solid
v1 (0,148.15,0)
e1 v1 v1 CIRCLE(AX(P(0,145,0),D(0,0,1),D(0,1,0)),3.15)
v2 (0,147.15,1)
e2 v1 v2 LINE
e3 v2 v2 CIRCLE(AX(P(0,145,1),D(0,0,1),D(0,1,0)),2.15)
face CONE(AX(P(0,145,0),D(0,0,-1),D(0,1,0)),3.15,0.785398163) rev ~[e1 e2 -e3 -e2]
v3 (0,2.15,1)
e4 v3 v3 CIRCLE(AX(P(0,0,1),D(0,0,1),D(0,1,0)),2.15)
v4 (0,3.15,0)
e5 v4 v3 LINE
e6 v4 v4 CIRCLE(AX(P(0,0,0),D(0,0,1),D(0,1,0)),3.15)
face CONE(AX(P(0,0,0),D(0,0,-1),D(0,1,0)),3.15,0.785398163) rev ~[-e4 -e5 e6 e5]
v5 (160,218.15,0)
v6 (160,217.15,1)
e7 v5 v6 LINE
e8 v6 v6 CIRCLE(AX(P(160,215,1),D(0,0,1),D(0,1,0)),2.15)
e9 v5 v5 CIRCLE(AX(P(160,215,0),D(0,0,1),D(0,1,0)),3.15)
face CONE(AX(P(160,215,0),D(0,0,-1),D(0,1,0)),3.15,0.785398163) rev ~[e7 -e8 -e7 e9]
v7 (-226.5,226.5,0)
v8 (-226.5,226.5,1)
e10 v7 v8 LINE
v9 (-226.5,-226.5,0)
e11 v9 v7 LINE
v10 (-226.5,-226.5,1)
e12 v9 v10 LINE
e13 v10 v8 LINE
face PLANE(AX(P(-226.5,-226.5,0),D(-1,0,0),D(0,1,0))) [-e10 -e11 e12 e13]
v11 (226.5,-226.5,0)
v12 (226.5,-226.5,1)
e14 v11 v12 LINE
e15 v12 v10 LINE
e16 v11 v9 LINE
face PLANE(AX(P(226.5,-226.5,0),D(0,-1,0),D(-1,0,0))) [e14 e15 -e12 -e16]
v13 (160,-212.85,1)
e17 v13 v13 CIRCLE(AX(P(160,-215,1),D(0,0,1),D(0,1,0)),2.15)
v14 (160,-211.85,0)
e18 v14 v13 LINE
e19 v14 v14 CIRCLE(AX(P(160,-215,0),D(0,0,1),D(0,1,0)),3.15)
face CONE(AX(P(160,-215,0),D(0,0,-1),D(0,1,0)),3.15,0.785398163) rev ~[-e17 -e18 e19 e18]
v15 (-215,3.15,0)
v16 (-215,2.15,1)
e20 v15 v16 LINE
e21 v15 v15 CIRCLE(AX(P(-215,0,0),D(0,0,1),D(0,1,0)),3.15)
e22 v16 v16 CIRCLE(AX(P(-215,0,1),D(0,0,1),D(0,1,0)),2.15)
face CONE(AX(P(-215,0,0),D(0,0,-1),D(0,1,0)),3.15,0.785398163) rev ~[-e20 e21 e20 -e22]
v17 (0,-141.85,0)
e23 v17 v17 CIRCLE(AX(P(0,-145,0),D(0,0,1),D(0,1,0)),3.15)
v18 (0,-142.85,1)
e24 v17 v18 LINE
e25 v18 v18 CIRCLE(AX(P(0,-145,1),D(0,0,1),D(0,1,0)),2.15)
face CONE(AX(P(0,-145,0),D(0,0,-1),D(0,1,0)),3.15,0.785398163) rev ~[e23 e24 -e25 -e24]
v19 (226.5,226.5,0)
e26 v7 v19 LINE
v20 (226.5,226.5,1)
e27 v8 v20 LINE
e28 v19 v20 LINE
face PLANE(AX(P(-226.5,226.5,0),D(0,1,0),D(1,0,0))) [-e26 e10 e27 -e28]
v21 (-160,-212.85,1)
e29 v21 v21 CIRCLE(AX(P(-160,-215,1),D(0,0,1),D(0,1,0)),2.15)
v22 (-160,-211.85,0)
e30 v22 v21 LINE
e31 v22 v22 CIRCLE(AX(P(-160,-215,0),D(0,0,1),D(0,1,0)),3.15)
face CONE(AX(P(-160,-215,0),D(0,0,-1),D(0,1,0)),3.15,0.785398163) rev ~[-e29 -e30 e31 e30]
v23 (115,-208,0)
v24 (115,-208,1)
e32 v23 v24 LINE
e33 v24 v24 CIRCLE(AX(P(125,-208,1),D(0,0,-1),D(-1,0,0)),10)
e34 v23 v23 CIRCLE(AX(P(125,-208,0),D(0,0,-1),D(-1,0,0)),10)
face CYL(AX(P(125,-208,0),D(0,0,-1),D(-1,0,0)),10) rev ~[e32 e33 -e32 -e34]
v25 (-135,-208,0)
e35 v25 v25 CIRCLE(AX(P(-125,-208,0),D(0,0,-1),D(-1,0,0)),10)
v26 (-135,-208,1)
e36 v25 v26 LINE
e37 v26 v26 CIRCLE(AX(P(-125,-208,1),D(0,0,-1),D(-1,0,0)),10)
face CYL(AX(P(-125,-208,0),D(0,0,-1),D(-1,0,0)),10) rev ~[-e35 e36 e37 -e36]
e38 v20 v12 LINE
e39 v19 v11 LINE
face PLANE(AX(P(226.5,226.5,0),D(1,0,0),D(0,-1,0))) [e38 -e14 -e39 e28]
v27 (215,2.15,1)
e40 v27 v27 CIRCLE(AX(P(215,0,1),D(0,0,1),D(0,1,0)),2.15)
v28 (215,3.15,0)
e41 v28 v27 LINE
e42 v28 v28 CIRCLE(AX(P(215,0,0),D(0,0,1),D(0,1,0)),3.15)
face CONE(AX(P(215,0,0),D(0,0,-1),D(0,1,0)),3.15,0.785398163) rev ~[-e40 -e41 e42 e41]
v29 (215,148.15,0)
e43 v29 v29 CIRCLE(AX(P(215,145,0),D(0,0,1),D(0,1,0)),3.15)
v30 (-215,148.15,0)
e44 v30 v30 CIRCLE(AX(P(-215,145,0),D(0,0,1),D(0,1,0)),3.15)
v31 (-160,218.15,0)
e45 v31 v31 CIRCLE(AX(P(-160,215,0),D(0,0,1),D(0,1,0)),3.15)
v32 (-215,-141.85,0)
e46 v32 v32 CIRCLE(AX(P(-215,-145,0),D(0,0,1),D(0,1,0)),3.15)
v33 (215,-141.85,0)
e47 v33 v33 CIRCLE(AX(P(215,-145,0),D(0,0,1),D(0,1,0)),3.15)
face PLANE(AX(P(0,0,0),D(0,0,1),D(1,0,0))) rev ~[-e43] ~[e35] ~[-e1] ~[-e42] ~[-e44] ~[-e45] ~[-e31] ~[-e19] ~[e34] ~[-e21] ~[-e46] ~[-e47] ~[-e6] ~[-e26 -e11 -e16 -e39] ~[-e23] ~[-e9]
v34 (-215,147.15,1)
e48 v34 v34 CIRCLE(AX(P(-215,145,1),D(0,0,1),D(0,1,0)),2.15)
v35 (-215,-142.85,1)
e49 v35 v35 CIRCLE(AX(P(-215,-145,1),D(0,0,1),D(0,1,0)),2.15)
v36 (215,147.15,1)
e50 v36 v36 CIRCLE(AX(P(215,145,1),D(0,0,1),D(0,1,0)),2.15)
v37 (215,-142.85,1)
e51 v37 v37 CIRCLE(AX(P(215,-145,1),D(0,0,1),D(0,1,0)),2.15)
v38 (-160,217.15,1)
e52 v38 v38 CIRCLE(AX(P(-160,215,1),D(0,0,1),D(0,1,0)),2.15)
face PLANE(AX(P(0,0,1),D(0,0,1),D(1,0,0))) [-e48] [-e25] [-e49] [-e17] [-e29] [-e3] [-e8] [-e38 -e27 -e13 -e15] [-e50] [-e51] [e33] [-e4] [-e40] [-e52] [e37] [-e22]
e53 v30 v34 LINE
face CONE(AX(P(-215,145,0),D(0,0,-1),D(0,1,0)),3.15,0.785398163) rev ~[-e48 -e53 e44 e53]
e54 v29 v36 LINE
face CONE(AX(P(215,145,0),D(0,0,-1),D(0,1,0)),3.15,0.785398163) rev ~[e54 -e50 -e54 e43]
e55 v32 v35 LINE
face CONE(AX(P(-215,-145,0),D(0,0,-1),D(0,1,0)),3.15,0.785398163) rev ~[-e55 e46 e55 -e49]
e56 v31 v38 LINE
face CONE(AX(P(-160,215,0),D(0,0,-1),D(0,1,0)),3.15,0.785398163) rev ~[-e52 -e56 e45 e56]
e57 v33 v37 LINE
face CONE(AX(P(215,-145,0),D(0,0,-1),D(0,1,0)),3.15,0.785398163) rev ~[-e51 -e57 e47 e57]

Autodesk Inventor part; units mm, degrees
ref_plane "YZ Plane" through (0, 0, 0) normal (1, 0, 0) x (0, 1, 0)
ref_plane "XZ Plane" through (0, 0, 0) normal (0, 1, 0) x (-1, 0, 0)
ref_plane "XY Plane" through (0, 0, 0) normal (0, 0, 1) x (1, 0, 0)
sketch "Skizze2" plane through (0, 0, 0) normal (0, 0, 1) x (1, 0, 0)
  line L0 (-226.5, 226.5) -> (226.5, 226.5)
  line L1 (226.5, 226.5) -> (226.5, -226.5)
  line L2 (226.5, -226.5) -> (-226.5, -226.5)
  line L3 (-226.5, -226.5) -> (-226.5, 226.5)
  point P0 (0, 0)
  point P1 (0, 226.5)
  point P2 (-226.5, 0)
  dimension "d0" = 453
extrude "Extrusion1" add sketch "Skizze2" along normal blind 1
sketch "Skizze3" plane through (0, 0, 0) normal (0, 0, -1) x (-1, 0, 0)
  circle A0 centre (125, -208) radius 10
  line L0 (0, -317.1) -> (0, 317.1) projected
  line L1 (226.5, -226.5) -> (-226.5, -226.5) projected
  point P0 (0, 0)
  dimension "d3" = 20
  dimension "d4" = 125
  dimension "d5" = 18.5
extrude "Extrusion2" cut sketch "Skizze3" against normal blind 1
pattern_linear "Rechteckige Anordnung1" count 2 spacing 250 along (1, 0, 0) of "Extrusion2"
sketch "Skizze4" plane through (0, 0, 0) normal (0, 0, -1) x (-1, 0, 0)
  point P0 (0, 0)
  point P1 (160, -215)
  point P2 (-160, -215)
  point P3 (-160, 215)
  point P4 (160, 215)
  point P5 (0, 0)
  point P6 (-215, -145)
  point P7 (-215, 0)
  point P8 (-215, 145)
  point P9 (215, 145)
  point P10 (215, 0)
  point P11 (215, -145)
  point P12 (0, 0)
  point P13 (0, -145)
  point P14 (0, 145)
  dimension "d11" = 160
  dimension "d12" = 160
  dimension "d13" = 215
  dimension "d14" = 215
  dimension "d22" = 215
  dimension "d23" = 145
  dimension "d24" = 145
  dimension "d25" = 215
  dimension "d26" = 145
  dimension "d27" = 145
hole "Bohrung1" at (0, 0, 0) direction (0, 0, 1) diameter 3.4 depth 15 tip angle 118 countersink diameter 6.3 countersink angle 90 clearance for "Flachkopfsenkschraube" size "M3" standard "Schneeberger VSM"
pattern_sketch "Skizzenbasierte Anordnung1" of "Bohrung1" from (0, 0, 0) copies at (-160, -215, 0) at (160, -215, 0) at (160, 215, 0) at (-160, 215, 0) at (215, -145, 0) at (215, 0, 0) at (215, 145, 0) at (-215, 145, 0) at (-215, 0, 0) at (-215, -145, 0) at (0, -145, 0) at (0, 145, 0)
equation "\"d10\" = 2 * d4"
equation "\"d14\" = d13"
equation "\"d23\" = d24"
equation "\"d25\" = d22"
equation "\"d27\" = d26"
properties part number "Rückplatte" material "PA 6.6"
